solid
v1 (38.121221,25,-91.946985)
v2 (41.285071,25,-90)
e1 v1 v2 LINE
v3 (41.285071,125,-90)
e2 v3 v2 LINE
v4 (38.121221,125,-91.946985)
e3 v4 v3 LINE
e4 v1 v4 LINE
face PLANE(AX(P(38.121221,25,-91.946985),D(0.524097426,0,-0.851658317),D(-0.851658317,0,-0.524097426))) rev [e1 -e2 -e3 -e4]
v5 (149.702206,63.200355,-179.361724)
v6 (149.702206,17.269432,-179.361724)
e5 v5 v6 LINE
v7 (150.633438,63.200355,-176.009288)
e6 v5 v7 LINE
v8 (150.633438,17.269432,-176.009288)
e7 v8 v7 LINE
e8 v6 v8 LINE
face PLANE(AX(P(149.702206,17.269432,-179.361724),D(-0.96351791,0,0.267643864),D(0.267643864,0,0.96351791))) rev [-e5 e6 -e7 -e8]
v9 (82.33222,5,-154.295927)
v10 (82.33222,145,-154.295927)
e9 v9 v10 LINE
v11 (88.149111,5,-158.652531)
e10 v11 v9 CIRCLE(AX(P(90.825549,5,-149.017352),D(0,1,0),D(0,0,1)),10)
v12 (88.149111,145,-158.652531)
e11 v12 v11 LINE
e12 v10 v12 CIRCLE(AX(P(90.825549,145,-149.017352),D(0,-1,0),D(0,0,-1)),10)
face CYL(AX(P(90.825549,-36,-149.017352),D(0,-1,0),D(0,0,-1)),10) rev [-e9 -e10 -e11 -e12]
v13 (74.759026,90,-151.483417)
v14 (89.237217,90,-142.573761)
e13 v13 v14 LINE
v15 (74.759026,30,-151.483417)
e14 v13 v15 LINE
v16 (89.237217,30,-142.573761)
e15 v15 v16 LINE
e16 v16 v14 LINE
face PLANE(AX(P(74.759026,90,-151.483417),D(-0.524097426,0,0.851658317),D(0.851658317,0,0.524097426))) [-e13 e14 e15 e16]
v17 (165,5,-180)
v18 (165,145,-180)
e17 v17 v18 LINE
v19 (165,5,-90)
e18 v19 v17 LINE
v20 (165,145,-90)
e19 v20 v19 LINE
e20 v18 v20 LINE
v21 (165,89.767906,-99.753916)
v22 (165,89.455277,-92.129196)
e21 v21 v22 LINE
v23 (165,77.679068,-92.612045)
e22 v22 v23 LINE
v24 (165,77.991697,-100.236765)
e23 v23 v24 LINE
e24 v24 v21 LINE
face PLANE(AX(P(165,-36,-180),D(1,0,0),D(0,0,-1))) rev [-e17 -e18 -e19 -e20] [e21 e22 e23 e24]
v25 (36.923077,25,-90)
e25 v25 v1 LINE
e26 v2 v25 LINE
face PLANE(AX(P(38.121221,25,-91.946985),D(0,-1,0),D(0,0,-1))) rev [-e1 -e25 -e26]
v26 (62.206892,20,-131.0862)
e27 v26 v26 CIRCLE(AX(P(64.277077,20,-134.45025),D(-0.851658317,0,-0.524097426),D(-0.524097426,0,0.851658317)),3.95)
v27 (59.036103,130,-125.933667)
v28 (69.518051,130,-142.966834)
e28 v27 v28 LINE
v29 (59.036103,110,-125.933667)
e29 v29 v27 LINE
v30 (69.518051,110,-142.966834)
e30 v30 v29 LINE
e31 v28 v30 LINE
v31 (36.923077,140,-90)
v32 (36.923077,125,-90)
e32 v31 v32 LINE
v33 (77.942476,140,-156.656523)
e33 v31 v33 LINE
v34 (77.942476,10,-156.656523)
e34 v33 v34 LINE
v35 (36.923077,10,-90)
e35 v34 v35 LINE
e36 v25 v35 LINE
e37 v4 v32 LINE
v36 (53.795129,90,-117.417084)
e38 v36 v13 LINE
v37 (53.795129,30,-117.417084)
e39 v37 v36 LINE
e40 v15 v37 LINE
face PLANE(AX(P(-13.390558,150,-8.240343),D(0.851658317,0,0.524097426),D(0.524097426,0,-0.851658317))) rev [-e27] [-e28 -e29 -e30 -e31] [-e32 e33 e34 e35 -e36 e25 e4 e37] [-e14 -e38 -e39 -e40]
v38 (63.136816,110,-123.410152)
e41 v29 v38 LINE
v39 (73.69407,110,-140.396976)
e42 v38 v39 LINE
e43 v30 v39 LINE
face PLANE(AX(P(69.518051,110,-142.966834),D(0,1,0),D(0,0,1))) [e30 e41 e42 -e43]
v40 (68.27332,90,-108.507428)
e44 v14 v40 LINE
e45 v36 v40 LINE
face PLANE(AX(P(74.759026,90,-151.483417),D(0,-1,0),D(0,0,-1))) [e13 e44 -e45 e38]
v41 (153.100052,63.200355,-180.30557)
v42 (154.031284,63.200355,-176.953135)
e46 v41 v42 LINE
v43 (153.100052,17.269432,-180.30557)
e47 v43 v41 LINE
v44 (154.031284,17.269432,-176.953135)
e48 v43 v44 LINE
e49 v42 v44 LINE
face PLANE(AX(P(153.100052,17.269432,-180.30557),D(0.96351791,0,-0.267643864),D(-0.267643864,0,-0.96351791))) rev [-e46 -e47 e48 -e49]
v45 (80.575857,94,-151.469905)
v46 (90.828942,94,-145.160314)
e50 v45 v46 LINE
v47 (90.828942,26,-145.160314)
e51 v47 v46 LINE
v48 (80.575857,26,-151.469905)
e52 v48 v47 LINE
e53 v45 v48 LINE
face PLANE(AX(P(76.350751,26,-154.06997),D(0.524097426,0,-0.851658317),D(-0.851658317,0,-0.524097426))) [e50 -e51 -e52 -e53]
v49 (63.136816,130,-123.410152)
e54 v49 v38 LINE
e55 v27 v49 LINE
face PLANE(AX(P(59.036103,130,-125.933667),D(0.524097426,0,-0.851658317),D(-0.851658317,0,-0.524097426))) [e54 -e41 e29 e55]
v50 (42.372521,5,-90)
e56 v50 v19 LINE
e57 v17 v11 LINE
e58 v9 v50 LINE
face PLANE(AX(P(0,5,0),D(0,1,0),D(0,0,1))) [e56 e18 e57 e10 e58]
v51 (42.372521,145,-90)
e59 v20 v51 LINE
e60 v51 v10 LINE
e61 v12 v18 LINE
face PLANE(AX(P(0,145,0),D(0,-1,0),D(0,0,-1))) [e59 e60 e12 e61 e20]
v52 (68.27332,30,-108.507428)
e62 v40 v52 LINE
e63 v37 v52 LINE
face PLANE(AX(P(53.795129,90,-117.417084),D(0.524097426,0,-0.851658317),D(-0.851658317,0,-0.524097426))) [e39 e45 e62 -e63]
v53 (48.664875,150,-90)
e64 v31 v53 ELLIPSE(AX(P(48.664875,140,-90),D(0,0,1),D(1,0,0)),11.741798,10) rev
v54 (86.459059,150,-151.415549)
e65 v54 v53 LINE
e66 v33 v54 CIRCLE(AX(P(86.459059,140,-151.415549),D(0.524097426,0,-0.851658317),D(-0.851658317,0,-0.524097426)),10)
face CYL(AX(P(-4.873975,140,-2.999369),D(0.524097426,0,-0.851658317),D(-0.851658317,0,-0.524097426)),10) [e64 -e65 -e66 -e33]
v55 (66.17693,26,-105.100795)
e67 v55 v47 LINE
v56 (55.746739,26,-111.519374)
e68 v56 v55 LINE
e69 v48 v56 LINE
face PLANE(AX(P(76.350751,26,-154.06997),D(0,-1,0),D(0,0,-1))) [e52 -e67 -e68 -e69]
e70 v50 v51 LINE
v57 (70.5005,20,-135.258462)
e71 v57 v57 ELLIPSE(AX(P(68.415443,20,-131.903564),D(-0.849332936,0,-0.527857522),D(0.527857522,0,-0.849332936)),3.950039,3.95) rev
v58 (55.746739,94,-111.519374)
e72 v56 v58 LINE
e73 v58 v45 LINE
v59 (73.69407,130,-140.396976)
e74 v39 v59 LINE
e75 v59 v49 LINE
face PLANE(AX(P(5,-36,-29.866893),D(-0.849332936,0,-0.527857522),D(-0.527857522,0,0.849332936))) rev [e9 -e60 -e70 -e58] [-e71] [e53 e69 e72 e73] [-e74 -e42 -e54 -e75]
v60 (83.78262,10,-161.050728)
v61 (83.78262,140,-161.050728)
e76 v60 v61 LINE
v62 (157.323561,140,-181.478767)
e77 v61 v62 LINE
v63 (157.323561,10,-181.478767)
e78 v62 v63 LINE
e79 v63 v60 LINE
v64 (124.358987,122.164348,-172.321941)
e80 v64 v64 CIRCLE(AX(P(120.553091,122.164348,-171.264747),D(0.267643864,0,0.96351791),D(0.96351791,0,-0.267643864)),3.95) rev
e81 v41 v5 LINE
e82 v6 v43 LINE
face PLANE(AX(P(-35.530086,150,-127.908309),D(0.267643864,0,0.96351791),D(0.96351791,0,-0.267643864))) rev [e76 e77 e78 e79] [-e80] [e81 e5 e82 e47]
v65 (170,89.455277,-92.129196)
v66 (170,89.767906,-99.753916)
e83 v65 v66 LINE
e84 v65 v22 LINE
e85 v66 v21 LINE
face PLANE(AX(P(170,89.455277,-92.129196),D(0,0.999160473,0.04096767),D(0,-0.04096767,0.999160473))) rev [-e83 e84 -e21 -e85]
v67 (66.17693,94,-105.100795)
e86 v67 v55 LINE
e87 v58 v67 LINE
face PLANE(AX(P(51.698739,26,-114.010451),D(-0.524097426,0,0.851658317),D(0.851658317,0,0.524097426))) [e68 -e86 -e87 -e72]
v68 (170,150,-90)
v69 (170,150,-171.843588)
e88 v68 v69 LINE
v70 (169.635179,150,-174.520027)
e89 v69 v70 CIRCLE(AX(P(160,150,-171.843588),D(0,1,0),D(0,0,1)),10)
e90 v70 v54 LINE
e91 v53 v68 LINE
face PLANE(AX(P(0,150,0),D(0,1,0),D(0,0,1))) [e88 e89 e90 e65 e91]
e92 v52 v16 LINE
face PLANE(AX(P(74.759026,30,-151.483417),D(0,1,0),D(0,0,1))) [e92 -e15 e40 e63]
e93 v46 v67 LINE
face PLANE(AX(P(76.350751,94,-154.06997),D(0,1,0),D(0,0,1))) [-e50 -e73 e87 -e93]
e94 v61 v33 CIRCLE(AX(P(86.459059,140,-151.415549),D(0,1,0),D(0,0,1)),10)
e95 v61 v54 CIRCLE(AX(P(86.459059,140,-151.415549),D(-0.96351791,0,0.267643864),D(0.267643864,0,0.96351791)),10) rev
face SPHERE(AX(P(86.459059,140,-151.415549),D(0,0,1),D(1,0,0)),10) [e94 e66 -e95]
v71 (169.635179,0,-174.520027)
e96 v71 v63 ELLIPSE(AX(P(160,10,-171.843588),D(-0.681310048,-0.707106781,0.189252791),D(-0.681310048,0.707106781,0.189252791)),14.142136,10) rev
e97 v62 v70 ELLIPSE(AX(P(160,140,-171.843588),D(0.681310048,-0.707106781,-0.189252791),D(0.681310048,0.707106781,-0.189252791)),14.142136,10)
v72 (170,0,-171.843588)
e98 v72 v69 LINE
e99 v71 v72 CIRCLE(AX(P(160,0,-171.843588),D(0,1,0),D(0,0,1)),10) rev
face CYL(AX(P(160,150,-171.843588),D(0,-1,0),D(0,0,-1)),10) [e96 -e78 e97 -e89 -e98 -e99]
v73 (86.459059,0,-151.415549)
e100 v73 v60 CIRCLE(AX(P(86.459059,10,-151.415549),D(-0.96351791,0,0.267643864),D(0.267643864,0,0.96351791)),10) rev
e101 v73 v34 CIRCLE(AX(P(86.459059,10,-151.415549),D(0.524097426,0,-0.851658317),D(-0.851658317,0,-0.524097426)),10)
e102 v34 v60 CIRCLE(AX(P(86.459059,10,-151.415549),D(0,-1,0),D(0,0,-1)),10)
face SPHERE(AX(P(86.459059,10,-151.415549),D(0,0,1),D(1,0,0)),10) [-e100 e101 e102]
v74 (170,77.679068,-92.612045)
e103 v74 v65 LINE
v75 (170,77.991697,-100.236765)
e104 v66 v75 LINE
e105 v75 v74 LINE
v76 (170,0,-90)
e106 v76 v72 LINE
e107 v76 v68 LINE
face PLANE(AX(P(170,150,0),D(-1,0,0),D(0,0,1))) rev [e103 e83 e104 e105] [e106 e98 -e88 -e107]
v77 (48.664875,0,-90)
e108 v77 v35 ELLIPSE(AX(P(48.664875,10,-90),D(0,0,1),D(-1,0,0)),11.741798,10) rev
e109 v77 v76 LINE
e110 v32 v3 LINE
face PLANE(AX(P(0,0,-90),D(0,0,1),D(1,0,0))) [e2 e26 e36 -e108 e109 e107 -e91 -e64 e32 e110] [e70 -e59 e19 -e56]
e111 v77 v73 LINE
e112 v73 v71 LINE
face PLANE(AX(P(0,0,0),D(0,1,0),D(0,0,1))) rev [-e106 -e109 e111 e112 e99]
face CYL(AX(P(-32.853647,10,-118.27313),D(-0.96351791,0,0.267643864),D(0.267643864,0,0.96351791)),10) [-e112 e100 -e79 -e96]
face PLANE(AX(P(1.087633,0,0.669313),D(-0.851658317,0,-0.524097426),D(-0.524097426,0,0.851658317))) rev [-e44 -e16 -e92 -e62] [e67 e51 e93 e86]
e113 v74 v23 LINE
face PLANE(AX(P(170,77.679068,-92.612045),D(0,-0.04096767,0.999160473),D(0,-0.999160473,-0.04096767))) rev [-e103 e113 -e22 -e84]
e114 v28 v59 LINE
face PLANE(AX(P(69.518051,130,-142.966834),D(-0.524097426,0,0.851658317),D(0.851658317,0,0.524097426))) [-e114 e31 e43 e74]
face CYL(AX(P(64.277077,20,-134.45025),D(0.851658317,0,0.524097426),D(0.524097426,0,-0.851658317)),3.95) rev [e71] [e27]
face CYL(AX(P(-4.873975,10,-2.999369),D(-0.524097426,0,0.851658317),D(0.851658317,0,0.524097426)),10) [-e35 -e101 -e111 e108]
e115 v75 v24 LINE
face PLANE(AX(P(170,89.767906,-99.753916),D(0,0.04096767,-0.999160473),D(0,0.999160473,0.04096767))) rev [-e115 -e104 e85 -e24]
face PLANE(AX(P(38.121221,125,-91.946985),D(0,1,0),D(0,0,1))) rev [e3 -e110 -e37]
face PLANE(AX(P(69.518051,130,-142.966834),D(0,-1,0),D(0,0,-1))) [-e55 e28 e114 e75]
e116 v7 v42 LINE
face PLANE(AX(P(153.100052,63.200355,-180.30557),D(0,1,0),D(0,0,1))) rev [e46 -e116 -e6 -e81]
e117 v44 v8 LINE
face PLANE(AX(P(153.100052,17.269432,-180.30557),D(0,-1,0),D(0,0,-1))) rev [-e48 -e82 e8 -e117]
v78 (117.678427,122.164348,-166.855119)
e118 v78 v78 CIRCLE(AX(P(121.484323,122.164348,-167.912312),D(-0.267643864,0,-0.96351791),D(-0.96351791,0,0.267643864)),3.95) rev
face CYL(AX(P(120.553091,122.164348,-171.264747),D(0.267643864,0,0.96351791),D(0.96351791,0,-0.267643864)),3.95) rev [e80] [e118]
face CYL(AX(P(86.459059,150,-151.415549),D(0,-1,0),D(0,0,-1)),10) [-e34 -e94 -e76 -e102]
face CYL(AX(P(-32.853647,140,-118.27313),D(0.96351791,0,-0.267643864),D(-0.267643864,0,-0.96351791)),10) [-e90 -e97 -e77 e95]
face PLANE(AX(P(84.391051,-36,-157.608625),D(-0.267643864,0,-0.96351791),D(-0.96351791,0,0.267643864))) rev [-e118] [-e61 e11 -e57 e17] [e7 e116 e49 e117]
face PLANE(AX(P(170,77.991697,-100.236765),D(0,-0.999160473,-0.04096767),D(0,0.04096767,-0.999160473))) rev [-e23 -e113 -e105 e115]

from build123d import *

# Parameters (mm, degrees)
ESBO_O1_W                  = 170
ESBO_O1_H                  = 30
RESSALTO_EXTRUS_O1_DEPTH   = 150
CORTE_EXTRUS_O1_DEPTH      = 222
CORTE_EXTRUS_O1_DEPTH_BACK = 36
RESSALTO_EXTRUS_O2_DEPTH   = 5
RESSALTO_EXTRUS_O3_DEPTH   = 5
ESBO_O4_W                  = 159.333333333
ESBO_O4_H                  = 140.588235294
CORTE_EXTRUS_O2_DEPTH      = 25
CORTE_EXTRUS_O3_DEPTH      = 31
CORTE_EXTRUS_O4_DEPTH      = 42
FILETE1_R                  = 10
CORTE_EXTRUS_O5_DEPTH      = 32
CORTE_EXTRUS_O6_START      = -15.72292277
CORTE_EXTRUS_O6_OUTLINE_R  = 3.95
CORTE_EXTRUS_O6_DEPTH      = 4.876648775
CORTE_EXTRUS_O7_START      = -132.751356438
CORTE_EXTRUS_O7_OUTLINE_R  = 3.95
CORTE_EXTRUS_O7_DEPTH      = 3.479370229
RESSALTO_EXTRUS_O6_DEPTH   = 17
RESSALTO_EXTRUS_O7_DEPTH   = 4
CORTE_EXTRUS_O8_DEPTH      = 21
F_3DSKETCH12_R             = 1.5
CORTE_EXTRUS_O9_DEPTH      = 14
CORTE_EXTRUS_O10_DEPTH     = 19
ESBO_O11_W                 = 17.407525744
ESBO_O11_H                 = 16.792397695
CORTE_EXTRUS_O11_DEPTH     = 10
CORTE_EXTRUS_O12_DEPTH     = 20
CORTE_EXTRUS_O13_DEPTH     = 14
ESBO_O12_W                 = 182.438351364
ESBO_O12_H                 = 161.616583002
CORTE_EXTRUS_O14_DEPTH     = 90


# Read off the part's stored shape, not the designer's step: Corte-extrusão6, Corte-extrusão7
with BuildPart() as part:
    # Esboço1 → Ressalto-extrusão1 (new body)
    with BuildSketch(Plane(origin=(0, 0, 0), x_dir=(1, 0, 0), z_dir=(0, 1, 0))):
        with Locations((85, 15)):
            Rectangle(ESBO_O1_W, ESBO_O1_H)
        Polygon((80, 160), (0, 30), (170, 30), (170, 160), align=None)
        Polygon((170, 160), (170, 185), (80, 160), align=None)
    extrude(amount=RESSALTO_EXTRUS_O1_DEPTH)

    # Esboço2 → Corte-extrusão1 (cut, two sides: drawn at the far end of the back side and taken through both)
    with BuildSketch(Plane(origin=(0, 0, 0), x_dir=(1, 0, 0), z_dir=(0, 1, 0)).offset(-CORTE_EXTRUS_O1_DEPTH_BACK)):
        Polygon((84.391050739, 157.608625205), (165, 180), (165, 5), (5, 5), (5, 29.866892941), align=None)
    extrude(amount=CORTE_EXTRUS_O1_DEPTH + CORTE_EXTRUS_O1_DEPTH_BACK, mode=Mode.SUBTRACT)

    # Esboço3 → Ressalto-extrusão2 (add)
    with BuildSketch(Plane(origin=(0, 0, 0), x_dir=(1, 0, 0), z_dir=(0, 1, 0))):
        Polygon((84.391050739, 157.608625205), (165, 180), (165, 5), (5, 5), (5, 29.866892941), align=None)
    extrude(amount=RESSALTO_EXTRUS_O2_DEPTH)

    # 3DSketch2 → Ressalto-extrusão3 (add)
    with BuildSketch(Plane(origin=(165, 150, -5), x_dir=(0, 0, -1), z_dir=(0, 1, 0))):
        Polygon((0, 0), (0, 160), (24.866892941, 160), (152.608625205, 80.608949261), (175, 0), align=None)
    extrude(amount=-RESSALTO_EXTRUS_O3_DEPTH)

    # Esboço4 → Corte-extrusão2 (cut)
    with BuildSketch(Plane.XY):
        with Locations((85.333333333, 74.705882353)):
            Rectangle(ESBO_O4_W, ESBO_O4_H)
    extrude(amount=-CORTE_EXTRUS_O2_DEPTH, mode=Mode.SUBTRACT)

    # 3DSketch3 → Corte-extrusão3 (cut)
    with BuildSketch(Plane(origin=(74.759025743, 90, -151.483416833), x_dir=(-0.29071694485714406, -0.8320502943378435, 0.4724150353928592), z_dir=(-0.8516583167045438, 0, -0.5240974256643346))):
        Polygon((0, 0), (22.188007849, 33.282011774), (72.111025509, 0), (49.92301766, -33.282011774), align=None)
    extrude(amount=-CORTE_EXTRUS_O3_DEPTH, mode=Mode.SUBTRACT)

    # 3DSketch4 → Corte-extrusão4 (cut)
    with BuildSketch(Plane(origin=(69.518051487, 130, -142.966833666), x_dir=(-0.37059284368967266, -0.7071067811865471, 0.6022133709956982), z_dir=(0.8516583167045362, 0, 0.5240974256643472))):
        Polygon((0, 0), (14.142135624, -14.142135624), (28.284271247, 0), (14.142135624, 14.142135624), align=None)
    extrude(amount=CORTE_EXTRUS_O4_DEPTH, mode=Mode.SUBTRACT)

    # Filete1
    filete1_edges = [part.edges().sort_by_distance(p)[0] for p in [
        (170, 75, -185),
        (125, 0, -172.5),
        (125, 150, -172.5),
        (80, 75, -160),
        (40, 0, -95),
        (40, 150, -95),
        (0, 75, -30),
        (84.391050739, 75, -157.608625205),
    ]]
    fillet(filete1_edges, radius=FILETE1_R)

    # 3DSketch5 → Corte-extrusão5 (cut)
    with BuildSketch(Plane(origin=(38.121221288, 25, -91.946984593), x_dir=(-0.194644897392922, 0.9284766908852593, 0.31629795826349816), z_dir=(0.851658316704544, 0, 0.5240974256643347))):
        Polygon((0, 0), (14.855627054, 37.139067635), (107.703296143, 0), (92.847669089, -37.139067635), align=None)
    extrude(amount=CORTE_EXTRUS_O5_DEPTH, mode=Mode.SUBTRACT)

    # Corte-extrusão6 outline → Corte-extrusão6 (cut)
    with BuildSketch(Plane(origin=(0, 0, 0), x_dir=(0.5240974256643349, 0, -0.8516583167045437), z_dir=(0.8516583167045437, 0, 0.5240974256643349)).offset(CORTE_EXTRUS_O6_START)):
        with Locations((148.193124726, 20)):
            Circle(CORTE_EXTRUS_O6_OUTLINE_R)
    extrude(amount=CORTE_EXTRUS_O6_DEPTH, mode=Mode.SUBTRACT)

    # Corte-extrusão7 outline → Corte-extrusão7 (cut)
    with BuildSketch(Plane(origin=(0, 0, 0), x_dir=(0.9635179096299408, 0, -0.267643863786094), z_dir=(0.267643863786094, 0, 0.9635179096299409)).offset(CORTE_EXTRUS_O7_START)):
        with Locations((161.993020775, 122.164347625)):
            Circle(CORTE_EXTRUS_O7_OUTLINE_R)
    extrude(amount=CORTE_EXTRUS_O7_DEPTH, mode=Mode.SUBTRACT)

    # 3DSketch9 → Ressalto-extrusão6 (add)
    with BuildSketch(Plane(origin=(76.350750718, 26, -154.069969916), x_dir=(-0.29815073011621673, 0.8224176546598938, 0.4844949364388514), z_dir=(0.8516583167045438, 0, 0.5240974256643349))):
        Polygon((0, 0), (26.758649409, 38.684123705), (82.683049926, 0), (55.924400517, -38.684123705), align=None)
        Polygon((5.017416454, 0.222210211), (27.772783339, 33.118916398), (77.117842619, -1.01413393), (54.362475733, -33.910840117), align=None, mode=Mode.SUBTRACT)
    extrude(amount=RESSALTO_EXTRUS_O6_DEPTH)

    # 3DSketch10 → Ressalto-extrusão7 (add, along a direction that is not the sketch's normal)
    with BuildSketch(Plane(origin=(0, 0, 0), x_dir=(0.7498378553650926, 0.6616216370868463, 0), z_dir=(0, 0, 1))):
        with BuildLine():
            Line((0, 0), (14.996757107, -13.232432742))
            Line((14.996757107, -13.232432742), (28.229189849, 1.764324366))
            ThreePointArc((28.229189849, 1.764324366), (21.556867541, 14.536675999), (25.141622209, 28.493838504))
            Line((25.141622209, 28.493838504), (13.232432742, 14.996757107))
            Line((13.232432742, 14.996757107), (0, 0))
        make_face()
        with BuildLine():
            Line((99.243245563, 112.475678305), (115.742930564, 97.917132715))
            Line((115.742930564, 97.917132715), (100.070543679, 80.155094246))
            ThreePointArc((100.070543679, 80.155094246), (86.055529464, 85.755516688), (71.66166921, 81.216558438))
            Line((71.66166921, 81.216558438), (83.570858678, 94.713639835))
            Line((83.570858678, 94.713639835), (99.243245563, 112.475678305))
        make_face()
        Polygon((226.715680975, 0), (211.718923868, 13.232432742), (198.486491126, -1.764324366), (213.483248233, -14.996757107), align=None)
        Polygon((127.472435412, -112.475678305), (112.475678305, -99.243245563), (125.708111047, -84.246488456), (140.704868154, -97.478921197), align=None)
    extrude(amount=-RESSALTO_EXTRUS_O7_DEPTH, dir=(0.26764386378609445, 0, 0.9635179096299407))

    # 3DSketch11 → Corte-extrusão8 (cut)
    with BuildSketch(Plane(origin=(153.100052242, 17.26943239, -180.305570067), x_dir=(-0.07376023038027929, 0.9970655099962036, 0.02048895288341091), z_dir=(0.2676438637860946, 0, 0.9635179096299407))):
        Polygon((0, 0), (0.269964353, 3.516152018), (46.066103253, 0), (45.7961389, -3.516152018), align=None)
    extrude(amount=CORTE_EXTRUS_O8_DEPTH, mode=Mode.SUBTRACT)

    # 3DSketch12 → Corte-extrusão9 (cut)
    with BuildSketch(Plane(origin=(160, 140, 0), x_dir=(-0.7560654573770964, -0.6544960077503622, 0), z_dir=(0, 0, 1))):
        with Locations(Location((0, 0, 0), (0, 0, 319.118554366))):
            Circle(F_3DSKETCH12_R)
        with Locations(Location((85.084481008, 98.288509459, 0), (0, 0, 319.118554366))):
            Circle(F_3DSKETCH12_R)
        with Locations(Location((113.858951537, -96.124361942, 0), (0, 0, 139.118554366))):
            Circle(F_3DSKETCH12_R)
        with Locations(Location((196.909602971, 0, 0), (0, 0, 139.118554366))):
            Circle(F_3DSKETCH12_R)
    extrude(amount=-CORTE_EXTRUS_O9_DEPTH, mode=Mode.SUBTRACT)

    # 3DSketch13 → Corte-extrusão10 (cut)
    with BuildSketch(Plane(origin=(170, 70.245878967, 0), x_dir=(0, -0.4354246522459521, -0.9002251786172678), z_dir=(-1, 0, 0))):
        Polygon((0, 0), (32.261446294, -15.604350297), (39.809023237, 0), (7.547576943, 15.604350297), align=None)
    extrude(amount=CORTE_EXTRUS_O10_DEPTH, mode=Mode.SUBTRACT)

    # Esboço11 → Corte-extrusão11 (cut)
    with BuildSketch(Plane(origin=(170, 0, 0), x_dir=(0, 0, -1), z_dir=(1, 0, 0))):
        with Locations((8.703762872, 30.096304842)):
            Rectangle(ESBO_O11_W, ESBO_O11_H)
    extrude(amount=-CORTE_EXTRUS_O11_DEPTH, mode=Mode.SUBTRACT)

    # 3DSketch14 → Corte-extrusão12 (cut)
    with BuildSketch(Plane(origin=(170, 87.396079578, 0), x_dir=(0, -0.09341146144778735, -0.9956275904524686), z_dir=(1, 0, 0))):
        Polygon((0, 0), (20.627912038, 1.935345533), (19.506160301, 13.891554783), (-1.121751737, 11.956209249), align=None)
        Polygon((-2.576084268, 27.457236328), (18.165947056, 29.403288726), (16.691971594, 45.113680317), (-4.050059731, 43.167627919), align=None)
        Polygon((91.534016736, 10.656116635), (99.096194716, 11.679615344), (100.676965661, 0), (93.114787682, -1.02349871), align=None)
    extrude(amount=-CORTE_EXTRUS_O12_DEPTH, mode=Mode.SUBTRACT)

    # 3DSketch15 → Corte-extrusão13 (cut)
    with BuildSketch(Plane(origin=(129.748977416, 150, 0), x_dir=(-0.6170578351280018, 0, -0.7869178026370631), z_dir=(0, -1, 0))):
        Polygon((0, 0), (11.819817446, 9.268453377), (19.087630878, 0), (7.267813432, -9.268453377), align=None)
    extrude(amount=CORTE_EXTRUS_O13_DEPTH, mode=Mode.SUBTRACT)

    # Esboço12 → Corte-extrusão14 (cut)
    with BuildSketch(Plane.XY):
        with Locations((84.195107922, 72.896320561)):
            Rectangle(ESBO_O12_W, ESBO_O12_H)
    extrude(amount=-CORTE_EXTRUS_O14_DEPTH, mode=Mode.SUBTRACT)


solid = part.part
